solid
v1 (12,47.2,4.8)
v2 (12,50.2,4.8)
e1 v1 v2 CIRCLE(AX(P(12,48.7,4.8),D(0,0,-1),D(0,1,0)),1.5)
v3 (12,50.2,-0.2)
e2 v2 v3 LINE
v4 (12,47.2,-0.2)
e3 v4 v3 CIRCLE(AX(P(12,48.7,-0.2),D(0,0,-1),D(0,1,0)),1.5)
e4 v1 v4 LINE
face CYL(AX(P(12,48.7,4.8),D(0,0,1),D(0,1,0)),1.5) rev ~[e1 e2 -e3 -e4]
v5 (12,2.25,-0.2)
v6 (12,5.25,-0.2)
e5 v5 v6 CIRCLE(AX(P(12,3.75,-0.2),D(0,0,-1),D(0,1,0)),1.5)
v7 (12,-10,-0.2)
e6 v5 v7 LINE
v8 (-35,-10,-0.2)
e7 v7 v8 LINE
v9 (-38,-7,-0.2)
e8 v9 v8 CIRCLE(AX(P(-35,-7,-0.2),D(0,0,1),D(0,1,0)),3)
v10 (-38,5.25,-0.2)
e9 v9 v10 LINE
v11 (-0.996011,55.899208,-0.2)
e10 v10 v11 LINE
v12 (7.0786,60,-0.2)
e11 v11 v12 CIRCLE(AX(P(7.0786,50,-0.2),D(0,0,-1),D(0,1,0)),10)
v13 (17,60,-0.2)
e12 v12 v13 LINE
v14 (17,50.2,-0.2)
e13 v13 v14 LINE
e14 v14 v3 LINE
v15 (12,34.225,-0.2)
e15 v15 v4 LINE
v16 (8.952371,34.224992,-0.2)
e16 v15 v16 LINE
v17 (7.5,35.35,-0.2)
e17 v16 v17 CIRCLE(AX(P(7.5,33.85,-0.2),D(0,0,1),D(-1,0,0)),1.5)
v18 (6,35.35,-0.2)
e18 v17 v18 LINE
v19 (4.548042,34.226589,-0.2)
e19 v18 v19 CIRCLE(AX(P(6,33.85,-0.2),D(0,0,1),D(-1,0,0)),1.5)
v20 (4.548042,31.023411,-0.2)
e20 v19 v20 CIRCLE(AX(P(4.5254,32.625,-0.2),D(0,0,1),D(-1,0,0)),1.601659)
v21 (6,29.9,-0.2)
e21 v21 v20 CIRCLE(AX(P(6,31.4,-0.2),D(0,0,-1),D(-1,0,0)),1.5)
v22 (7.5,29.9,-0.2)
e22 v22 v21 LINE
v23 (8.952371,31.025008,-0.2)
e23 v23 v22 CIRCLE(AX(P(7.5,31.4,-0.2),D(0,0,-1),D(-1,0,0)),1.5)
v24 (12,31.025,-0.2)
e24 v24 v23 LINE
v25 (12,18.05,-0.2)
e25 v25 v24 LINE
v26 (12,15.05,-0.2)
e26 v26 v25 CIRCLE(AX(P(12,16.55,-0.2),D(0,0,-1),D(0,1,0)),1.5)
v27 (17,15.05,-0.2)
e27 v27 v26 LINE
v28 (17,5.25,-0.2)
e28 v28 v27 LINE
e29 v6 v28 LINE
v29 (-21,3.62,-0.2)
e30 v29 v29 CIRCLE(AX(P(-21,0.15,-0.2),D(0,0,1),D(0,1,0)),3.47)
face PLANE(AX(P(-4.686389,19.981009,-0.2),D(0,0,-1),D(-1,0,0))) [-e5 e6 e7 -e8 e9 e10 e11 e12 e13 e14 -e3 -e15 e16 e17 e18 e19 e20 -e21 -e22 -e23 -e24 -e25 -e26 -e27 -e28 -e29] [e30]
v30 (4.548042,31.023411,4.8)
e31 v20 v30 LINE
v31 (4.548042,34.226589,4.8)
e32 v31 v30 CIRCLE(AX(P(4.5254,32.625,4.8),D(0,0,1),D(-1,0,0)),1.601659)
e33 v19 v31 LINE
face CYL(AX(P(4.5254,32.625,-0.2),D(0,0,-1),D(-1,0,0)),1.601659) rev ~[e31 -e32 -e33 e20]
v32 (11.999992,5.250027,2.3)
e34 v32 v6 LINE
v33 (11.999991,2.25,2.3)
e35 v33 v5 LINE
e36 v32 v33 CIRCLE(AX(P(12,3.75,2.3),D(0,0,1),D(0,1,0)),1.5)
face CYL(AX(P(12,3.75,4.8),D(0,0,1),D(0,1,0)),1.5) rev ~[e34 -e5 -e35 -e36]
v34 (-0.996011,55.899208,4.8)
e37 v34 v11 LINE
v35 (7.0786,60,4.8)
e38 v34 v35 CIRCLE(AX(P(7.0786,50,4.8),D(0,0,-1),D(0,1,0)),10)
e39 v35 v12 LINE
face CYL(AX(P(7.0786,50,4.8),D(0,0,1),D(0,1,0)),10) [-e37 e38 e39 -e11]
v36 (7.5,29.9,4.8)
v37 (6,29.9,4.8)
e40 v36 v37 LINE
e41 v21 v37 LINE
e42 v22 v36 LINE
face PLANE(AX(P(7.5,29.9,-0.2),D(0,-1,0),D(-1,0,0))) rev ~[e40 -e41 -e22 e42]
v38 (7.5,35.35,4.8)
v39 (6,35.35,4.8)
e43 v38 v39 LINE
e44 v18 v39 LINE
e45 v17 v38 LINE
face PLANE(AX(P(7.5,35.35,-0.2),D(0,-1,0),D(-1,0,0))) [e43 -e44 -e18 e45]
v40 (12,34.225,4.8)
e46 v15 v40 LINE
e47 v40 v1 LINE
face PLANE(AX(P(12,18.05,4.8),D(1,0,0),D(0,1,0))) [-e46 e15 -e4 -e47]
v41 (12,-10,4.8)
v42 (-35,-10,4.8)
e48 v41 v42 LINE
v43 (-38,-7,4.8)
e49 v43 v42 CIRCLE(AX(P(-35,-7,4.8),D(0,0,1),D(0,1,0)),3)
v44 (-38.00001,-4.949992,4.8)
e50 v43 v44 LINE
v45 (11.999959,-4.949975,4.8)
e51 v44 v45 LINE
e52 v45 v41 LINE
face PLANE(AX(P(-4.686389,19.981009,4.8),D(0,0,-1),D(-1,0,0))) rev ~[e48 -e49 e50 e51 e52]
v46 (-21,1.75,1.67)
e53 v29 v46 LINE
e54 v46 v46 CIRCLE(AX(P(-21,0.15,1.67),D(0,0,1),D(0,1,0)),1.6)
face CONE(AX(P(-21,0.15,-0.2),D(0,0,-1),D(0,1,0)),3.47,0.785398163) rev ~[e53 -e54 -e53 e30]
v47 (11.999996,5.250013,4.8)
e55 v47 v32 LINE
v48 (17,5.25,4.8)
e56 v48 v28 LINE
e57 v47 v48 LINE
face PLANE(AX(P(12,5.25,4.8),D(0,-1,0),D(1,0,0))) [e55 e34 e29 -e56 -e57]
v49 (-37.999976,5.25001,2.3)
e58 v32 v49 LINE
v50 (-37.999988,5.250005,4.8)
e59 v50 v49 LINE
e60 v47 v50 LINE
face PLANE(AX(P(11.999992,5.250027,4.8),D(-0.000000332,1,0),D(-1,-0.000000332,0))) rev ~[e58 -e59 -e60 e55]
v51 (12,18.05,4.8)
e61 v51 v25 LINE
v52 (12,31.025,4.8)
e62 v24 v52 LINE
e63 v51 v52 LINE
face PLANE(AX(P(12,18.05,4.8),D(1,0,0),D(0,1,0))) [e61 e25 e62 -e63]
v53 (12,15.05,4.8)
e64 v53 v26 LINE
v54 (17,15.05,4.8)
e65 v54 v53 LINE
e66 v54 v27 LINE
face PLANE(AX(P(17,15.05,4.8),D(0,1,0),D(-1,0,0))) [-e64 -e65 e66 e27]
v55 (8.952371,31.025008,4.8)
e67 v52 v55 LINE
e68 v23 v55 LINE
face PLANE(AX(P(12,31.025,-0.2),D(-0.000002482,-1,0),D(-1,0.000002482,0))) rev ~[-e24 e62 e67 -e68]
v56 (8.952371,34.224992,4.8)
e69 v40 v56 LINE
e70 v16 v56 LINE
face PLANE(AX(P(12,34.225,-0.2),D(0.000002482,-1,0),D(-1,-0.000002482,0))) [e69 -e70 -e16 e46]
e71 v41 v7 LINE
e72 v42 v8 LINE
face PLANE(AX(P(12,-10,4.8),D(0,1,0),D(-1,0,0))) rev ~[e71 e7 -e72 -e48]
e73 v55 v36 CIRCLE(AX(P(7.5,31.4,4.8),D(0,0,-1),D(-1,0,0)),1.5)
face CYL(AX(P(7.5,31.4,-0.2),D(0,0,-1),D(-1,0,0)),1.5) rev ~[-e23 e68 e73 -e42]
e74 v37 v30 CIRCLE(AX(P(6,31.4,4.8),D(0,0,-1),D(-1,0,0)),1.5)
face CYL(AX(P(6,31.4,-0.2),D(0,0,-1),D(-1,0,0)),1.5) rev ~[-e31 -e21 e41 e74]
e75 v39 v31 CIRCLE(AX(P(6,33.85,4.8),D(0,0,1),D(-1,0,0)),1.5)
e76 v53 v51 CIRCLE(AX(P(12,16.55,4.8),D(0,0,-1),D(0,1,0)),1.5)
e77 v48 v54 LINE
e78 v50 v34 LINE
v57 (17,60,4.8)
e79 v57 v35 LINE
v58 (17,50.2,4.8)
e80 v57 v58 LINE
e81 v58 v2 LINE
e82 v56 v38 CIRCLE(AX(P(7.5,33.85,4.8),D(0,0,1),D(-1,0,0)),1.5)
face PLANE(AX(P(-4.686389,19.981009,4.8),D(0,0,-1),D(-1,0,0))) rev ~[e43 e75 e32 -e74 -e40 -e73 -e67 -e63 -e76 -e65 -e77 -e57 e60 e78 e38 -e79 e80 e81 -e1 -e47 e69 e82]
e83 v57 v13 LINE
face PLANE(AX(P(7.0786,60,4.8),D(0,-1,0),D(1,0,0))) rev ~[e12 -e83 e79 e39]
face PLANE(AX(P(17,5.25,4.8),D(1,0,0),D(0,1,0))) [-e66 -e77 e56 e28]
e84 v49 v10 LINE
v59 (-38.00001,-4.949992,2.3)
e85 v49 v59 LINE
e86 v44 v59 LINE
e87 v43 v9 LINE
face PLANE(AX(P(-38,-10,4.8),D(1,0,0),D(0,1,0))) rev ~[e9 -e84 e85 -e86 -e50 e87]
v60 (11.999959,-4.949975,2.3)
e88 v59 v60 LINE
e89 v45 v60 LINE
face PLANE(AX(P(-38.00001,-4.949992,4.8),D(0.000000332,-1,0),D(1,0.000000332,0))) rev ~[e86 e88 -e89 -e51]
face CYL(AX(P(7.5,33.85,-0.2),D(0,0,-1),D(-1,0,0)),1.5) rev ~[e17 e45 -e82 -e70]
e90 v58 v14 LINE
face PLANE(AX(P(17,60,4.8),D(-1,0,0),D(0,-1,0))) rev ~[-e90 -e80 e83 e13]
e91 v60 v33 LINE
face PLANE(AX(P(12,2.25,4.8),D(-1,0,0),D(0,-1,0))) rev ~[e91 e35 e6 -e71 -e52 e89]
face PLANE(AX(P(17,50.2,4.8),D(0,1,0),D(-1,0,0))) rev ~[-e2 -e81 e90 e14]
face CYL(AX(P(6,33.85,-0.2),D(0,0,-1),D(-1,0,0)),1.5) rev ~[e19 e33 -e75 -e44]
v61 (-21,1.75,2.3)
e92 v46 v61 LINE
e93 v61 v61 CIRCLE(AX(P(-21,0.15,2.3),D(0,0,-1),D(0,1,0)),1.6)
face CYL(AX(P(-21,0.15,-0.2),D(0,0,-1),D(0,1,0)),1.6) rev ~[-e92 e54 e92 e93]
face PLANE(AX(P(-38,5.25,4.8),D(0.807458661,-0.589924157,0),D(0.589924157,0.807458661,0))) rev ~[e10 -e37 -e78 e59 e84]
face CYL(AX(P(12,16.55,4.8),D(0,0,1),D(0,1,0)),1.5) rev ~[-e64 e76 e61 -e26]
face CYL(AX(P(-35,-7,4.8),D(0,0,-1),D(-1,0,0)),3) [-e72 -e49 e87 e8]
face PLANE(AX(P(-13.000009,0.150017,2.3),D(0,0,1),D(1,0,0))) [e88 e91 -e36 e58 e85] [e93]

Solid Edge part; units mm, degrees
sketch "Sketch1" plane through (-10.5, 25.05, 4.8) normal (0, 0, 1) x (0, 1, 0)
  line L0 (-19.8, 27.5) -> (30.8492, -9.504)
  line L1 (-35.05, 27.5) -> (-19.8, 27.5)
  line L2 (-35.05, -22.5) -> (-35.05, 27.5)
  line L3 (-22.8, -22.5) -> (-35.05, -22.5)
  arc A0 (-22.8, -22.5) -> (-19.8, -22.5) centre (-21.3, -22.5) cw
  line L4 (-19.8, -22.5) -> (-19.8, -27.5)
  line L5 (-19.8, -27.5) -> (-10, -27.5)
  line L6 (-10, -27.5) -> (-10, -22.5)
  arc A1 (-10, -22.5) -> (-7, -22.5) centre (-8.5, -22.5) cw
  line L7 (-7, -22.5) -> (22.15, -22.5)
  arc A2 (22.15, -22.5) -> (25.15, -22.5) centre (23.65, -22.5) cw
  line L8 (25.15, -27.5) -> (25.15, -22.5)
  line L9 (34.95, -27.5) -> (25.15, -27.5)
  line L10 (34.95, -22.5) -> (34.95, -27.5)
  line L11 (34.95, -17.5786) -> (34.95, -22.5)
  arc A3 (30.8492, -9.504) -> (34.95, -17.5786) centre (24.95, -17.5786) cw
extrude "ExtrudedProtrusion_3" add sketch "Sketch1" against normal blind 5
sketch "Sketch2" plane through (-13, 0, 2.3) normal (0, 0, 1) x (0, 1, 0)
  circle A0 centre (0.15, 8) radius 1.55
  dimension "D1" = 17
  dimension "D2" = 5.1
extrude "ExtrudedCutout_14" cut sketch "Sketch2" against normal blind 5
fillet "Round_3" radius 3 1 edges at (-38, -10, 2.3)
sketch "Sketch3" plane through (-10.5, 25, -0.2) normal (0, 0, -1) x (-1, 0, 0)
  arc A0 (-19.4524, 9.225) -> (-18, 10.35) centre (-18, 8.85) cw
  line L0 (-18, 10.35) -> (-16.5, 10.35)
  arc A1 (-16.5, 10.35) -> (-15.048, 9.2266) centre (-16.5, 8.85) cw
  arc A2 (-16.5, 4.9) -> (-15.048, 6.0234) centre (-16.5, 6.4) ccw
  line L1 (-18, 4.9) -> (-16.5, 4.9)
  arc A3 (-19.4524, 6.025) -> (-18, 4.9) centre (-18, 6.4) ccw
  line L2 (-22.5, 6.025) -> (-19.4524, 6.025)
  line L3 (-22.5, 7.625) -> (-22.5, 6.025)
  line L4 (-22.5, 7.625) -> (-22.5, 9.225)
  line L5 (-22.5, 9.225) -> (-19.4524, 9.225)
  arc A4 (-15.048, 9.2265) -> (-15.048, 6.0235) centre (-15.0254, 7.625) cw
extrude "Cutout1" cut sketch "Sketch3" against normal blind 5
sketch "Sketch4" plane through (-10.5, 25, 4.8) normal (0, 0, 1) x (0.5899241, 0.8074587, 0)
  line L0 (-2.674, -29.8188) -> (-32.1702, 10.5541)
  line L1 (-32.1702, 10.5541) -> (-40.4063, 4.5369)
  line L2 (-40.4063, 4.5369) -> (-10.9101, -35.836)
  line L3 (-10.9101, -35.836) -> (-2.674, -29.8188)
extrude "ExtrudedCutout_16" cut sketch "Sketch4" against normal blind 2.5
hole "Hole_4" at (-21, 0.15, -0.2) direction (0, 0, 1) diameter 3.2 end up to next countersink diameter 6.94 countersink angle 90
properties material "Polycarbonate"
